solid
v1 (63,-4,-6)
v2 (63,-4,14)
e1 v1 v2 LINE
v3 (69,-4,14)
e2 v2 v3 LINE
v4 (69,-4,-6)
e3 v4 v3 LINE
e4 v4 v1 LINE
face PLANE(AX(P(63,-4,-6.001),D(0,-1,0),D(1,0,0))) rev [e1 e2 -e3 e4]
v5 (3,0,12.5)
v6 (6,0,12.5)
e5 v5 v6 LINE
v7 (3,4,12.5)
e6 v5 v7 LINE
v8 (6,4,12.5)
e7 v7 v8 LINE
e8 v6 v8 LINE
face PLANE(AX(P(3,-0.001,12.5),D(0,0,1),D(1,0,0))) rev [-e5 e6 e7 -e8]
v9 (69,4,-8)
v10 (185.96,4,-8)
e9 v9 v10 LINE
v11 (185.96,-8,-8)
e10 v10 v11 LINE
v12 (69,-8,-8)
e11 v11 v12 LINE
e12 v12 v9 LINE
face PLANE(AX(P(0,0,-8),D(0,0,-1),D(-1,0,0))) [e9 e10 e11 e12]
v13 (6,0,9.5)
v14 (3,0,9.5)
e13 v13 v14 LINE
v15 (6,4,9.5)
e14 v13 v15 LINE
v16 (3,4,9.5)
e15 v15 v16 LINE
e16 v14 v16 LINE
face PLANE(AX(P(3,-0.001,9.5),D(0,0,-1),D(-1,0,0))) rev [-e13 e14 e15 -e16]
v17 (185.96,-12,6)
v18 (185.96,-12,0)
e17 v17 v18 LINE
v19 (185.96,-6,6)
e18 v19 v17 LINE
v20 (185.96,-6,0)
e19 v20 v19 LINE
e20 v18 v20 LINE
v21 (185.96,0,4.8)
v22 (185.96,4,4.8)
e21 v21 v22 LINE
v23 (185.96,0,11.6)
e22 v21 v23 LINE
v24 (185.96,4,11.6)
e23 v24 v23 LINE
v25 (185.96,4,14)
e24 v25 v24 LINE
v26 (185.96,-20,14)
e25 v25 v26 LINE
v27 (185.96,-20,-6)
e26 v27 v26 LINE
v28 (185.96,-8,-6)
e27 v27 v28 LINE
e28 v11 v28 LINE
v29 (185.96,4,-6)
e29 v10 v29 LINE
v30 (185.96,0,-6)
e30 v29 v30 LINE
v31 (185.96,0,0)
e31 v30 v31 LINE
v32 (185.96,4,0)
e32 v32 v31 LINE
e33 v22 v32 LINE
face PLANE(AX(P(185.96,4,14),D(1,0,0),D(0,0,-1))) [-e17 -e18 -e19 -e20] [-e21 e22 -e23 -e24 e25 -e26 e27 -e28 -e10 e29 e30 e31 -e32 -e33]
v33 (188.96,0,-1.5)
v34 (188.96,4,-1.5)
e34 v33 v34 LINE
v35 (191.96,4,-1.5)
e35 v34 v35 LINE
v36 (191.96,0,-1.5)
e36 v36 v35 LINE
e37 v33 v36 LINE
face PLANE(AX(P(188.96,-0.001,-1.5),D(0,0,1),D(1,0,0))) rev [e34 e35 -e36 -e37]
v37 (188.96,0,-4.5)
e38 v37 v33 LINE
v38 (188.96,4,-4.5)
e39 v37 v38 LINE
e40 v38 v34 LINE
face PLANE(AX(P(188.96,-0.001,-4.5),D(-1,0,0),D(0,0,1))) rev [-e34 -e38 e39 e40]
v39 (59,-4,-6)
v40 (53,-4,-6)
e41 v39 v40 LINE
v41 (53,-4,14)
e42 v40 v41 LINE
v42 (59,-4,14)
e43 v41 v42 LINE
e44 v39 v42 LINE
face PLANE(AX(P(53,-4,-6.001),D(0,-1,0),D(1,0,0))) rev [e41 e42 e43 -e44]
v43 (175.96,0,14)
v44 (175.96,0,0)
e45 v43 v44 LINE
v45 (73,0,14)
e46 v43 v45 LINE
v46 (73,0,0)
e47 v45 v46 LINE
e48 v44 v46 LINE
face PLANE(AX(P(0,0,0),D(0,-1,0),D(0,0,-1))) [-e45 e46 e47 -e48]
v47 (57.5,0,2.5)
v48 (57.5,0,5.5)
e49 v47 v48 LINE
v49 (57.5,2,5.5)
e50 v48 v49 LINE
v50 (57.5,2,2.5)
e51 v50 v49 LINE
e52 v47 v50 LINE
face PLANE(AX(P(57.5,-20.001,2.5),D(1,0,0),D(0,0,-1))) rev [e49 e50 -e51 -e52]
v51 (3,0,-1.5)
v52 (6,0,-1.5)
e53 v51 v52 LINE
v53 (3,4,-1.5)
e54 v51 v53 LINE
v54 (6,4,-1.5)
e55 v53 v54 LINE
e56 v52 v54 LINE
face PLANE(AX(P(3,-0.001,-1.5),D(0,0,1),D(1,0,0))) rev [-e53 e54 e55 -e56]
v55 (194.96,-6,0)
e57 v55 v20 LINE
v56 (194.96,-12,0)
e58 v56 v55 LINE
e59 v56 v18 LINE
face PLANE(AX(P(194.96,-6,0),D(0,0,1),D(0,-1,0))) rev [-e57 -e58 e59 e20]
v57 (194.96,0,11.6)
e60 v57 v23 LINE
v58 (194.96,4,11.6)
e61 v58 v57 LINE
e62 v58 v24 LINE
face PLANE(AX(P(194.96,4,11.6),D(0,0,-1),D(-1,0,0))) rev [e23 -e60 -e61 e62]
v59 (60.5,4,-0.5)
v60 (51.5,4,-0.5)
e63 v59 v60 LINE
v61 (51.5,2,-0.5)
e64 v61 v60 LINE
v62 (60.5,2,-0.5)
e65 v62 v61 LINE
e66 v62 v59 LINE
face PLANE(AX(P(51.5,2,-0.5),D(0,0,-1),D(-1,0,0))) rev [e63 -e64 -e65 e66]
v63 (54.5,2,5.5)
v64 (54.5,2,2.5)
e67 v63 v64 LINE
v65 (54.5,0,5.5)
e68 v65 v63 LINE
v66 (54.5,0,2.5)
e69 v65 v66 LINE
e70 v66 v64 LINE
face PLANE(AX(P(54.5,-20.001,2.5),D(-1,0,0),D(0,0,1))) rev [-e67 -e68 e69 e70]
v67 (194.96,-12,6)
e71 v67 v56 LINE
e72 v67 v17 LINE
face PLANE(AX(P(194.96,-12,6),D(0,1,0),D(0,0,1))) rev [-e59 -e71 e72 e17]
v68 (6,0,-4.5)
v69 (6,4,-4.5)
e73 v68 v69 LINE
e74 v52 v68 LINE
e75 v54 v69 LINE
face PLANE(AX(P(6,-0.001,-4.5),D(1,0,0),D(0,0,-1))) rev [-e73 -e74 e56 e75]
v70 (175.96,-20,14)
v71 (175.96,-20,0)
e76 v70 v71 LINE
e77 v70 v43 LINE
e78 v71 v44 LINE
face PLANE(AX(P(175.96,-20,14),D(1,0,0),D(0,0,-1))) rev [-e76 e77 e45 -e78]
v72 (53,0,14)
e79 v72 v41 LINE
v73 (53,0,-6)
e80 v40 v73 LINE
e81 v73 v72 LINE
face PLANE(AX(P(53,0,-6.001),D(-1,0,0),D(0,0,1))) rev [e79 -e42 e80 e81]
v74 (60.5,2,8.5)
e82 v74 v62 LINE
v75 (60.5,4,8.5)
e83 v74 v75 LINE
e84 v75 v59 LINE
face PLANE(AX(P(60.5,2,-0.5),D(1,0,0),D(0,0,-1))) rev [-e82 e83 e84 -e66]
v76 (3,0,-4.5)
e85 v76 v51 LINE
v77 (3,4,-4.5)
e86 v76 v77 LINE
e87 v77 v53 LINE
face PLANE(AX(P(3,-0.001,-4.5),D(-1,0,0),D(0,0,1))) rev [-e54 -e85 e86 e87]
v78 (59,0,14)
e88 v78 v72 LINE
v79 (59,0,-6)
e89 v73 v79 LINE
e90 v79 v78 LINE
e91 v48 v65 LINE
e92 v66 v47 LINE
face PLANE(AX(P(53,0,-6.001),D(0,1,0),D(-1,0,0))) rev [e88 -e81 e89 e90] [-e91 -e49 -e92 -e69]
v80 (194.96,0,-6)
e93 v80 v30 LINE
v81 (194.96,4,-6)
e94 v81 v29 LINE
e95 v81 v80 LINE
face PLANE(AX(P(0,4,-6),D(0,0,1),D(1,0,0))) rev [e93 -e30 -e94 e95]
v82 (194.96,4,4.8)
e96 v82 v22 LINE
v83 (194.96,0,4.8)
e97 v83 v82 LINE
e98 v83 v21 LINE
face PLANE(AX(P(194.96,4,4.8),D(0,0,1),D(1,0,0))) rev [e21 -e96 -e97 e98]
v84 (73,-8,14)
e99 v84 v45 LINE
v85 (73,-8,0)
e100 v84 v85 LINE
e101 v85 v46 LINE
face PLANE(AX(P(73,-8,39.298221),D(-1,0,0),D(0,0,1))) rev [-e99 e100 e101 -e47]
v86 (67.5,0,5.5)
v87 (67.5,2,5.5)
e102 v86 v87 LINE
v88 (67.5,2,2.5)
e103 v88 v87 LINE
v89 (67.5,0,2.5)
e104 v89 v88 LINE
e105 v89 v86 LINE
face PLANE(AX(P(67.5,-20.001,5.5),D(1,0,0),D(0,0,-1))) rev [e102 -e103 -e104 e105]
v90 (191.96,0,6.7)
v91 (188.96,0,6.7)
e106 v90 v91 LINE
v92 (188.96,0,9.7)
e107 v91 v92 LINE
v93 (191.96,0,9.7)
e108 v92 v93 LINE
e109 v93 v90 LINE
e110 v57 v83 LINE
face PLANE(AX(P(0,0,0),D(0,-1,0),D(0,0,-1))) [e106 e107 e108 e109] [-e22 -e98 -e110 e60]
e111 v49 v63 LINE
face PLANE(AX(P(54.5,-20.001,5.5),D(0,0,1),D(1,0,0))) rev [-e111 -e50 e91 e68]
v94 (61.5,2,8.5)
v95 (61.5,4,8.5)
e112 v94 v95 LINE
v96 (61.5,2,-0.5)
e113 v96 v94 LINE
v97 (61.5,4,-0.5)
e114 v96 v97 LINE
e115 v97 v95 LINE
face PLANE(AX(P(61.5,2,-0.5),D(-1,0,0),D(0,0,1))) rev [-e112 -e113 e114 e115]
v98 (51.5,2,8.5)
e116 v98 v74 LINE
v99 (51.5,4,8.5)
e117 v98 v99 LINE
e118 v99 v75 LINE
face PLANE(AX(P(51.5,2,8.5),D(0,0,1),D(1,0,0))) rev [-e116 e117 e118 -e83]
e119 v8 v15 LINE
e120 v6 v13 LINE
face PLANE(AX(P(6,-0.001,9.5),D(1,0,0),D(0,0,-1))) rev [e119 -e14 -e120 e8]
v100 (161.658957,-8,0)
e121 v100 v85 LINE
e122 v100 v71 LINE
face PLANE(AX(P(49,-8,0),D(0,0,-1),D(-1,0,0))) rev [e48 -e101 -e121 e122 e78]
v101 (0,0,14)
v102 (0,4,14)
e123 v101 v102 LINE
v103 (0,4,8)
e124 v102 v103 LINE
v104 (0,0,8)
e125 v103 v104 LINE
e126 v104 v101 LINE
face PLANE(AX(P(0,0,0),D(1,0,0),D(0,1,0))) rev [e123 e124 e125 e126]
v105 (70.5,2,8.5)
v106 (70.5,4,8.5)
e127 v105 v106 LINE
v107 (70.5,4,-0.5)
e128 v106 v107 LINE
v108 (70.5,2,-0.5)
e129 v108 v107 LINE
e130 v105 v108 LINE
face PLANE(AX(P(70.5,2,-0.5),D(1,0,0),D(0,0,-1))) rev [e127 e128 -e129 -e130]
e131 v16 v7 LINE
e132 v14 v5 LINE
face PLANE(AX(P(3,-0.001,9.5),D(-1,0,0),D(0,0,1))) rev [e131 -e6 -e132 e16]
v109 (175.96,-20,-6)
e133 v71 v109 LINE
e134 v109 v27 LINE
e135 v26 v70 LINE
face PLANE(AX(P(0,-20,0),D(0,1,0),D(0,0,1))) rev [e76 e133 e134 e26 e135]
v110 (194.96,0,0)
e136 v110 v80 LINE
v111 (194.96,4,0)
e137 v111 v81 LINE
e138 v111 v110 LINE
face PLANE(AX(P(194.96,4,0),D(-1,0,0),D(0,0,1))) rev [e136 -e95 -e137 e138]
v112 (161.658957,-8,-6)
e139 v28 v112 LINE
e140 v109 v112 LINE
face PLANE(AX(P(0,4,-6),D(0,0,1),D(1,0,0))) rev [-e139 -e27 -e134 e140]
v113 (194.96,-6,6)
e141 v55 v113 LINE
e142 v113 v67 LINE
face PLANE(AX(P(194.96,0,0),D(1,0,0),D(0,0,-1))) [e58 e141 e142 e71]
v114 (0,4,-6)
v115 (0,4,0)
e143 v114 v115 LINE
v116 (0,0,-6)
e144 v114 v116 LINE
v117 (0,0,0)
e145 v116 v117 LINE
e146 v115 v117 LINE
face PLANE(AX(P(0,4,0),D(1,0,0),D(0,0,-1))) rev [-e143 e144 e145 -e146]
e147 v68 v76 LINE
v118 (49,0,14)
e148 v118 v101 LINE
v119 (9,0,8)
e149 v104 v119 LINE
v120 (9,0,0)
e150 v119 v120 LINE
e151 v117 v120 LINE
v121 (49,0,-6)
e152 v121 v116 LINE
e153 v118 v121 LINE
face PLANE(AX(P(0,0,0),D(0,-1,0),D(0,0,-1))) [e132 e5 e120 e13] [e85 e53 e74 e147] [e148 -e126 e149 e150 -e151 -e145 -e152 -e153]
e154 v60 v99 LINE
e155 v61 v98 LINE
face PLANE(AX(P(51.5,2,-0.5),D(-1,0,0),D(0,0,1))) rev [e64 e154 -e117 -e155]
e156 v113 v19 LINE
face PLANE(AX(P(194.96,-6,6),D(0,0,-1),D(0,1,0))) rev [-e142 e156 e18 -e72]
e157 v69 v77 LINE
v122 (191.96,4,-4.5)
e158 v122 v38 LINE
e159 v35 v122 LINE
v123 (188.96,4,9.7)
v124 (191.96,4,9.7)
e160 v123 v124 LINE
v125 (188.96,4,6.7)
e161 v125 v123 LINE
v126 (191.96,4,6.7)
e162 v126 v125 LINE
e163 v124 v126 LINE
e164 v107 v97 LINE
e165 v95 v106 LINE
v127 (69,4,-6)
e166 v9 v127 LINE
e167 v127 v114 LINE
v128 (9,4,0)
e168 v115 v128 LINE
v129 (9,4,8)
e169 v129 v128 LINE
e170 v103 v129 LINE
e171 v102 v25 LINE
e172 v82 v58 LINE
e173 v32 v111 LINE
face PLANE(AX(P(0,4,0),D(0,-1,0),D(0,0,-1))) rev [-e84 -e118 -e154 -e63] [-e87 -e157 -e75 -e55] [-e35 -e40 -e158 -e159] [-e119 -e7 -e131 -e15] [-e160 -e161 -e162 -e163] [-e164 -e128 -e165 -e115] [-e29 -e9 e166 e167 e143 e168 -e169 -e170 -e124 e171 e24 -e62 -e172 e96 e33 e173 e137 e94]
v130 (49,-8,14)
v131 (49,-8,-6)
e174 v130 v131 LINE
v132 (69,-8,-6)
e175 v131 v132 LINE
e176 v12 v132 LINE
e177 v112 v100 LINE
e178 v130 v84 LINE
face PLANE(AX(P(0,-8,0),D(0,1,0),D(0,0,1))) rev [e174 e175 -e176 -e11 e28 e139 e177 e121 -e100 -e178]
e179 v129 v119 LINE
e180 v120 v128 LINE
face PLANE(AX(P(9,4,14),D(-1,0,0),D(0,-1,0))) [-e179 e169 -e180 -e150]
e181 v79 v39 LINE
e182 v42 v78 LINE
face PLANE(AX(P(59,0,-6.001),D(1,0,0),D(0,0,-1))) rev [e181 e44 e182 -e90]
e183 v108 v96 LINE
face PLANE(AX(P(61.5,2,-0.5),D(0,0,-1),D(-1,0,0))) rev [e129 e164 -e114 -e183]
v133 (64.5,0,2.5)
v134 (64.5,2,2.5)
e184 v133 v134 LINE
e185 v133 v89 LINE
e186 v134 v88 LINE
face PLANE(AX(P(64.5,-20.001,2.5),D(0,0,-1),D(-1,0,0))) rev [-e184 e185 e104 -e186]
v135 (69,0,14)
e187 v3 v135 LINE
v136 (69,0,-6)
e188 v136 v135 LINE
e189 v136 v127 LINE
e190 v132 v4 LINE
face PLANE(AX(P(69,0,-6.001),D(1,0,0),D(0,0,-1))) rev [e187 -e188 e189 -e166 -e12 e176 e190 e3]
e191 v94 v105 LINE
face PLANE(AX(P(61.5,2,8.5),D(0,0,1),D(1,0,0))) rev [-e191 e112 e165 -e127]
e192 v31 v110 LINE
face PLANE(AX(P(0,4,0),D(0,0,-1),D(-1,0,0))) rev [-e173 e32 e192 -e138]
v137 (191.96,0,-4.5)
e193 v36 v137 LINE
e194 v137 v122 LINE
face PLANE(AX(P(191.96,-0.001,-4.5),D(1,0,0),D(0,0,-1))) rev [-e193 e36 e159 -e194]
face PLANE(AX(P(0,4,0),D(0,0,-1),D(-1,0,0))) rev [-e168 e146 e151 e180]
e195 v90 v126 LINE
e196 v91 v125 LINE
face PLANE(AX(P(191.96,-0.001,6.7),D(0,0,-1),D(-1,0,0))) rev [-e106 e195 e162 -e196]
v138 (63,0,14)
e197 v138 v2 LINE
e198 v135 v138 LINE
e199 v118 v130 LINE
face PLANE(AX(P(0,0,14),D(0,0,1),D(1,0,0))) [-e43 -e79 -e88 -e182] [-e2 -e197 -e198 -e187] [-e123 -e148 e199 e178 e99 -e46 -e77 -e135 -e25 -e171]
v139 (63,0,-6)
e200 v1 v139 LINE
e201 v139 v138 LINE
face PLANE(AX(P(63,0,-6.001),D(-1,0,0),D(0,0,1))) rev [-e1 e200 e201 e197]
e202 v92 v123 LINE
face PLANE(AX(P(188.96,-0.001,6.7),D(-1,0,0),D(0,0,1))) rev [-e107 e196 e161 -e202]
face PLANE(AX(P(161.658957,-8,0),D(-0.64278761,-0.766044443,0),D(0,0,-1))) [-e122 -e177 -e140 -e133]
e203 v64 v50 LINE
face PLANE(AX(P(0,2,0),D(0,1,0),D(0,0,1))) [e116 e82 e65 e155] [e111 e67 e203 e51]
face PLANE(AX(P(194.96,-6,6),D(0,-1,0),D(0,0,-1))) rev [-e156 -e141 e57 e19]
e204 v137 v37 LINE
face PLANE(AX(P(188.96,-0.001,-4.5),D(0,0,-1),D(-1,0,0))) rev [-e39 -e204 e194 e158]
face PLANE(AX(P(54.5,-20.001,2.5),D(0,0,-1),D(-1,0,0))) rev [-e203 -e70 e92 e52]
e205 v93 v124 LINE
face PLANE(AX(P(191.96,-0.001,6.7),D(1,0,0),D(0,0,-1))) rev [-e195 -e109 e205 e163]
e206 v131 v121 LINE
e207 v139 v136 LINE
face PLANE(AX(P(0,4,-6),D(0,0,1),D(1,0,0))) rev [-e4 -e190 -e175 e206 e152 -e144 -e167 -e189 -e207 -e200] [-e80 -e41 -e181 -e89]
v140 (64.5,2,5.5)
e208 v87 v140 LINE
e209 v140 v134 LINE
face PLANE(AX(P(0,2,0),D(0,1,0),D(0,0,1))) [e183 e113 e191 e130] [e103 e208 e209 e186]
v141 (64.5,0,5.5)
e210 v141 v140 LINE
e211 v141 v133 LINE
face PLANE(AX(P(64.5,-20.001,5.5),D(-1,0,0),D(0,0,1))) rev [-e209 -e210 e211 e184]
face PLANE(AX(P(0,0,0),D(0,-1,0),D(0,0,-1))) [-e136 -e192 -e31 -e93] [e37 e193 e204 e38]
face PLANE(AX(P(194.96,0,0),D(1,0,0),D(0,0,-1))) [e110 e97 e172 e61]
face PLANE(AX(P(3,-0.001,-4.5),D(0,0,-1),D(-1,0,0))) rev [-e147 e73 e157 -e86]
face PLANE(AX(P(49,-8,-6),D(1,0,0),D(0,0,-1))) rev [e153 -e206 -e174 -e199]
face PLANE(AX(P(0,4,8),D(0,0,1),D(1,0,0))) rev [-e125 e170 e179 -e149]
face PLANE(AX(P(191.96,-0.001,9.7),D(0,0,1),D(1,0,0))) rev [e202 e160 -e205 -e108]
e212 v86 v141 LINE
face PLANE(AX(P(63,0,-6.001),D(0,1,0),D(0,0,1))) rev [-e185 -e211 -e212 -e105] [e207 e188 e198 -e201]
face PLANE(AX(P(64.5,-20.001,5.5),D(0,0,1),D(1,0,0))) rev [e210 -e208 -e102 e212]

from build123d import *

# Parameters (mm, degrees)
SKETCH2_W           = 194.96
SKETCH2_H           = 6
BOSS_EXTRUDE1_DEPTH = 4
SKETCH3_W           = 176.96
SKETCH3_H           = 4
BOSS_EXTRUDE2_DEPTH = 14
SKETCH4_W           = 6
SKETCH4_H           = 4
BOSS_EXTRUDE3_DEPTH = 9
SKETCH5_W           = 6.8
SKETCH5_H           = 4
BOSS_EXTRUDE4_DEPTH = 9
CUT_EXTRUDE1_REACH  = 197.503
SKETCH6_W           = 3
SKETCH6_H           = 3
SKETCH7_W           = 10
SKETCH7_H           = 20
BOSS_EXTRUDE5_DEPTH = 20
SKETCH8_W           = 136.96
SKETCH8_H           = 6
BOSS_EXTRUDE6_DEPTH = 8
CHAMFER1_SIZE2      = 14.301043111
CHAMFER1_SIZE       = 12
BOSS_EXTRUDE7_DEPTH = 14
CUT_EXTRUDE2_REACH  = 199.001
SKETCH10_W          = 6
SKETCH10_H          = 4
CUT_EXTRUDE3_REACH  = 198.93
SKETCH11_W          = 3
SKETCH11_H          = 3
SKETCH12_W          = 116.96
SKETCH12_H          = 12
BOSS_EXTRUDE8_DEPTH = 2
SKETCH13_W          = 6
SKETCH13_H          = 6
BOSS_EXTRUDE9_DEPTH = 9
SKETCH14_W          = 9
SKETCH14_H          = 9
CUT_EXTRUDE4_DEPTH  = 2


with BuildPart() as part:
    # Sketch2 → Boss-Extrude1 (new body)
    with BuildSketch(Plane(origin=(0, 0, 0), x_dir=(1, 0, 0), z_dir=(0, 1, 0))):
        with Locations((97.48, 3)):
            Rectangle(SKETCH2_W, SKETCH2_H)
    extrude(amount=BOSS_EXTRUDE1_DEPTH)

    # Sketch3 → Boss-Extrude2 (add)
    with BuildSketch(Plane(origin=(0, 0, 0), x_dir=(-1, 0, 0), z_dir=(0, 0, -1))):
        with Locations((-97.48, 2)):
            Rectangle(SKETCH3_W, SKETCH3_H)
    extrude(amount=-BOSS_EXTRUDE2_DEPTH)

    # Sketch4 → Boss-Extrude3 (add)
    with BuildSketch(Plane.ZY.offset(-9)):
        with Locations((11, 2)):
            Rectangle(SKETCH4_W, SKETCH4_H)
    extrude(amount=BOSS_EXTRUDE3_DEPTH)

    # Sketch5 → Boss-Extrude4 (add)
    with BuildSketch(Plane(origin=(185.96, 0, 0), x_dir=(0, 0, -1), z_dir=(1, 0, 0))):
        with Locations((-8.2, 2)):
            Rectangle(SKETCH5_W, SKETCH5_H)
    extrude(amount=BOSS_EXTRUDE4_DEPTH)

    # Sketch6 → Cut-Extrude1 (cut, up to next)
    with BuildSketch(Plane(origin=(0, 4, 0), x_dir=(1, 0, 0), z_dir=(0, 1, 0)), mode=Mode.PRIVATE) as cut_extrude1_sk1:
        with Locations((4.5, 3)):
            Rectangle(SKETCH6_W, SKETCH6_H)
    cut_extrude1_tool1 = extrude(cut_extrude1_sk1.sketch, amount=-CUT_EXTRUDE1_REACH, mode=Mode.PRIVATE) & part.part
    # Sketch6 → Cut-Extrude1 (cut, up to next)
    with BuildSketch(Plane(origin=(0, 4, 0), x_dir=(1, 0, 0), z_dir=(0, 1, 0)), mode=Mode.PRIVATE) as cut_extrude1_sk2:
        with Locations((4.5, -11)):
            Rectangle(SKETCH6_W, SKETCH6_H)
    cut_extrude1_tool2 = extrude(cut_extrude1_sk2.sketch, amount=-CUT_EXTRUDE1_REACH, mode=Mode.PRIVATE) & part.part
    # Sketch6 → Cut-Extrude1 (cut, up to next)
    with BuildSketch(Plane(origin=(0, 4, 0), x_dir=(1, 0, 0), z_dir=(0, 1, 0)), mode=Mode.PRIVATE) as cut_extrude1_sk3:
        with Locations((190.46, 3)):
            Rectangle(SKETCH6_W, SKETCH6_H)
    cut_extrude1_tool3 = extrude(cut_extrude1_sk3.sketch, amount=-CUT_EXTRUDE1_REACH, mode=Mode.PRIVATE) & part.part
    # Sketch6 → Cut-Extrude1 (cut, up to next)
    with BuildSketch(Plane(origin=(0, 4, 0), x_dir=(1, 0, 0), z_dir=(0, 1, 0)), mode=Mode.PRIVATE) as cut_extrude1_sk4:
        with Locations((190.46, -8.2)):
            Rectangle(SKETCH6_W, SKETCH6_H)
    cut_extrude1_tool4 = extrude(cut_extrude1_sk4.sketch, amount=-CUT_EXTRUDE1_REACH, mode=Mode.PRIVATE) & part.part
    add(cut_extrude1_tool1.solids().sort_by_distance((4.5, 4, -3))[0], mode=Mode.SUBTRACT)
    add(cut_extrude1_tool2.solids().sort_by_distance((4.5, 4, 11))[0], mode=Mode.SUBTRACT)
    add(cut_extrude1_tool3.solids().sort_by_distance((190.46, 4, -3))[0], mode=Mode.SUBTRACT)
    add(cut_extrude1_tool4.solids().sort_by_distance((190.46, 4, 8.2))[0], mode=Mode.SUBTRACT)

    # Sketch7 → Boss-Extrude5 (add)
    with BuildSketch(Plane.XZ):
        with Locations((180.96, 4)):
            Rectangle(SKETCH7_W, SKETCH7_H)
    extrude(amount=BOSS_EXTRUDE5_DEPTH)

    # Sketch8 → Boss-Extrude6 (add)
    with BuildSketch(Plane.XZ):
        with Locations((117.48, -3)):
            Rectangle(SKETCH8_W, SKETCH8_H)
    extrude(amount=BOSS_EXTRUDE6_DEPTH)

    # Chamfer1
    chamfer1_edges = [part.edges().sort_by_distance(p)[0] for p in [
        (175.96, -8, -3),
    ]]
    chamfer1_side = [part.faces().sort_by_distance(p)[0] for p in [
        (175.96, -8.24, -3),
    ]]
    chamfer(chamfer1_edges, length=CHAMFER1_SIZE - 0.0001, length2=CHAMFER1_SIZE2 - 0.0001, reference=chamfer1_side[0])  # a hair under: the kernel refuses the full size

    # Sketch9 → Boss-Extrude7 (add)
    with BuildSketch(Plane.XY):
        Polygon((49, -8), (55, -8), (61, -8), (73, -8), (73, 0), (61, 0), (55, 0), (49, 0), align=None)
    extrude(amount=BOSS_EXTRUDE7_DEPTH)

    # Sketch10 → Cut-Extrude2 (cut, up to next)
    with BuildSketch(Plane.XY.offset(14), mode=Mode.PRIVATE) as cut_extrude2_sk1:
        with Locations((56, -2)):
            Rectangle(SKETCH10_W, SKETCH10_H)
    cut_extrude2_tool1 = extrude(cut_extrude2_sk1.sketch, amount=-CUT_EXTRUDE2_REACH, mode=Mode.PRIVATE) & part.part
    # Sketch10 → Cut-Extrude2 (cut, up to next)
    with BuildSketch(Plane.XY.offset(14), mode=Mode.PRIVATE) as cut_extrude2_sk2:
        with Locations((66, -2)):
            Rectangle(SKETCH10_W, SKETCH10_H)
    cut_extrude2_tool2 = extrude(cut_extrude2_sk2.sketch, amount=-CUT_EXTRUDE2_REACH, mode=Mode.PRIVATE) & part.part
    add(cut_extrude2_tool1.solids().sort_by_distance((56, -2, 14))[0], mode=Mode.SUBTRACT)
    add(cut_extrude2_tool2.solids().sort_by_distance((66, -2, 14))[0], mode=Mode.SUBTRACT)

    # Sketch11 → Cut-Extrude3 (cut, up to next)
    with BuildSketch(Plane(origin=(0, 4, 0), x_dir=(1, 0, 0), z_dir=(0, 1, 0)), mode=Mode.PRIVATE) as cut_extrude3_sk1:
        with Locations((56, -4)):
            Rectangle(SKETCH11_W, SKETCH11_H)
    cut_extrude3_tool1 = extrude(cut_extrude3_sk1.sketch, amount=-CUT_EXTRUDE3_REACH, mode=Mode.PRIVATE) & part.part
    # Sketch11 → Cut-Extrude3 (cut, up to next)
    with BuildSketch(Plane(origin=(0, 4, 0), x_dir=(1, 0, 0), z_dir=(0, 1, 0)), mode=Mode.PRIVATE) as cut_extrude3_sk2:
        with Locations((66, -4)):
            Rectangle(SKETCH11_W, SKETCH11_H)
    cut_extrude3_tool2 = extrude(cut_extrude3_sk2.sketch, amount=-CUT_EXTRUDE3_REACH, mode=Mode.PRIVATE) & part.part
    add(cut_extrude3_tool1.solids().sort_by_distance((56, 4, 4))[0], mode=Mode.SUBTRACT)
    add(cut_extrude3_tool2.solids().sort_by_distance((66, 4, 4))[0], mode=Mode.SUBTRACT)

    # Sketch12 → Boss-Extrude8 (add)
    with BuildSketch(Plane(origin=(0, 0, -6), x_dir=(-1, 0, 0), z_dir=(0, 0, -1))):
        with Locations((-127.48, -2)):
            Rectangle(SKETCH12_W, SKETCH12_H)
    extrude(amount=BOSS_EXTRUDE8_DEPTH)

    # Sketch13 → Boss-Extrude9 (add)
    with BuildSketch(Plane(origin=(185.96, 0, 0), x_dir=(0, 0, -1), z_dir=(1, 0, 0))):
        with Locations((-3, -9)):
            Rectangle(SKETCH13_W, SKETCH13_H)
    extrude(amount=BOSS_EXTRUDE9_DEPTH)

    # Sketch14 → Cut-Extrude4 (cut)
    with BuildSketch(Plane(origin=(0, 4, 0), x_dir=(1, 0, 0), z_dir=(0, 1, 0))):
        with Locations((66, -4)):
            Rectangle(SKETCH14_W, SKETCH14_H)
        with Locations((56, -4)):
            Rectangle(SKETCH14_W, SKETCH14_H)
    extrude(amount=-CUT_EXTRUDE4_DEPTH, mode=Mode.SUBTRACT)


solid = part.part
